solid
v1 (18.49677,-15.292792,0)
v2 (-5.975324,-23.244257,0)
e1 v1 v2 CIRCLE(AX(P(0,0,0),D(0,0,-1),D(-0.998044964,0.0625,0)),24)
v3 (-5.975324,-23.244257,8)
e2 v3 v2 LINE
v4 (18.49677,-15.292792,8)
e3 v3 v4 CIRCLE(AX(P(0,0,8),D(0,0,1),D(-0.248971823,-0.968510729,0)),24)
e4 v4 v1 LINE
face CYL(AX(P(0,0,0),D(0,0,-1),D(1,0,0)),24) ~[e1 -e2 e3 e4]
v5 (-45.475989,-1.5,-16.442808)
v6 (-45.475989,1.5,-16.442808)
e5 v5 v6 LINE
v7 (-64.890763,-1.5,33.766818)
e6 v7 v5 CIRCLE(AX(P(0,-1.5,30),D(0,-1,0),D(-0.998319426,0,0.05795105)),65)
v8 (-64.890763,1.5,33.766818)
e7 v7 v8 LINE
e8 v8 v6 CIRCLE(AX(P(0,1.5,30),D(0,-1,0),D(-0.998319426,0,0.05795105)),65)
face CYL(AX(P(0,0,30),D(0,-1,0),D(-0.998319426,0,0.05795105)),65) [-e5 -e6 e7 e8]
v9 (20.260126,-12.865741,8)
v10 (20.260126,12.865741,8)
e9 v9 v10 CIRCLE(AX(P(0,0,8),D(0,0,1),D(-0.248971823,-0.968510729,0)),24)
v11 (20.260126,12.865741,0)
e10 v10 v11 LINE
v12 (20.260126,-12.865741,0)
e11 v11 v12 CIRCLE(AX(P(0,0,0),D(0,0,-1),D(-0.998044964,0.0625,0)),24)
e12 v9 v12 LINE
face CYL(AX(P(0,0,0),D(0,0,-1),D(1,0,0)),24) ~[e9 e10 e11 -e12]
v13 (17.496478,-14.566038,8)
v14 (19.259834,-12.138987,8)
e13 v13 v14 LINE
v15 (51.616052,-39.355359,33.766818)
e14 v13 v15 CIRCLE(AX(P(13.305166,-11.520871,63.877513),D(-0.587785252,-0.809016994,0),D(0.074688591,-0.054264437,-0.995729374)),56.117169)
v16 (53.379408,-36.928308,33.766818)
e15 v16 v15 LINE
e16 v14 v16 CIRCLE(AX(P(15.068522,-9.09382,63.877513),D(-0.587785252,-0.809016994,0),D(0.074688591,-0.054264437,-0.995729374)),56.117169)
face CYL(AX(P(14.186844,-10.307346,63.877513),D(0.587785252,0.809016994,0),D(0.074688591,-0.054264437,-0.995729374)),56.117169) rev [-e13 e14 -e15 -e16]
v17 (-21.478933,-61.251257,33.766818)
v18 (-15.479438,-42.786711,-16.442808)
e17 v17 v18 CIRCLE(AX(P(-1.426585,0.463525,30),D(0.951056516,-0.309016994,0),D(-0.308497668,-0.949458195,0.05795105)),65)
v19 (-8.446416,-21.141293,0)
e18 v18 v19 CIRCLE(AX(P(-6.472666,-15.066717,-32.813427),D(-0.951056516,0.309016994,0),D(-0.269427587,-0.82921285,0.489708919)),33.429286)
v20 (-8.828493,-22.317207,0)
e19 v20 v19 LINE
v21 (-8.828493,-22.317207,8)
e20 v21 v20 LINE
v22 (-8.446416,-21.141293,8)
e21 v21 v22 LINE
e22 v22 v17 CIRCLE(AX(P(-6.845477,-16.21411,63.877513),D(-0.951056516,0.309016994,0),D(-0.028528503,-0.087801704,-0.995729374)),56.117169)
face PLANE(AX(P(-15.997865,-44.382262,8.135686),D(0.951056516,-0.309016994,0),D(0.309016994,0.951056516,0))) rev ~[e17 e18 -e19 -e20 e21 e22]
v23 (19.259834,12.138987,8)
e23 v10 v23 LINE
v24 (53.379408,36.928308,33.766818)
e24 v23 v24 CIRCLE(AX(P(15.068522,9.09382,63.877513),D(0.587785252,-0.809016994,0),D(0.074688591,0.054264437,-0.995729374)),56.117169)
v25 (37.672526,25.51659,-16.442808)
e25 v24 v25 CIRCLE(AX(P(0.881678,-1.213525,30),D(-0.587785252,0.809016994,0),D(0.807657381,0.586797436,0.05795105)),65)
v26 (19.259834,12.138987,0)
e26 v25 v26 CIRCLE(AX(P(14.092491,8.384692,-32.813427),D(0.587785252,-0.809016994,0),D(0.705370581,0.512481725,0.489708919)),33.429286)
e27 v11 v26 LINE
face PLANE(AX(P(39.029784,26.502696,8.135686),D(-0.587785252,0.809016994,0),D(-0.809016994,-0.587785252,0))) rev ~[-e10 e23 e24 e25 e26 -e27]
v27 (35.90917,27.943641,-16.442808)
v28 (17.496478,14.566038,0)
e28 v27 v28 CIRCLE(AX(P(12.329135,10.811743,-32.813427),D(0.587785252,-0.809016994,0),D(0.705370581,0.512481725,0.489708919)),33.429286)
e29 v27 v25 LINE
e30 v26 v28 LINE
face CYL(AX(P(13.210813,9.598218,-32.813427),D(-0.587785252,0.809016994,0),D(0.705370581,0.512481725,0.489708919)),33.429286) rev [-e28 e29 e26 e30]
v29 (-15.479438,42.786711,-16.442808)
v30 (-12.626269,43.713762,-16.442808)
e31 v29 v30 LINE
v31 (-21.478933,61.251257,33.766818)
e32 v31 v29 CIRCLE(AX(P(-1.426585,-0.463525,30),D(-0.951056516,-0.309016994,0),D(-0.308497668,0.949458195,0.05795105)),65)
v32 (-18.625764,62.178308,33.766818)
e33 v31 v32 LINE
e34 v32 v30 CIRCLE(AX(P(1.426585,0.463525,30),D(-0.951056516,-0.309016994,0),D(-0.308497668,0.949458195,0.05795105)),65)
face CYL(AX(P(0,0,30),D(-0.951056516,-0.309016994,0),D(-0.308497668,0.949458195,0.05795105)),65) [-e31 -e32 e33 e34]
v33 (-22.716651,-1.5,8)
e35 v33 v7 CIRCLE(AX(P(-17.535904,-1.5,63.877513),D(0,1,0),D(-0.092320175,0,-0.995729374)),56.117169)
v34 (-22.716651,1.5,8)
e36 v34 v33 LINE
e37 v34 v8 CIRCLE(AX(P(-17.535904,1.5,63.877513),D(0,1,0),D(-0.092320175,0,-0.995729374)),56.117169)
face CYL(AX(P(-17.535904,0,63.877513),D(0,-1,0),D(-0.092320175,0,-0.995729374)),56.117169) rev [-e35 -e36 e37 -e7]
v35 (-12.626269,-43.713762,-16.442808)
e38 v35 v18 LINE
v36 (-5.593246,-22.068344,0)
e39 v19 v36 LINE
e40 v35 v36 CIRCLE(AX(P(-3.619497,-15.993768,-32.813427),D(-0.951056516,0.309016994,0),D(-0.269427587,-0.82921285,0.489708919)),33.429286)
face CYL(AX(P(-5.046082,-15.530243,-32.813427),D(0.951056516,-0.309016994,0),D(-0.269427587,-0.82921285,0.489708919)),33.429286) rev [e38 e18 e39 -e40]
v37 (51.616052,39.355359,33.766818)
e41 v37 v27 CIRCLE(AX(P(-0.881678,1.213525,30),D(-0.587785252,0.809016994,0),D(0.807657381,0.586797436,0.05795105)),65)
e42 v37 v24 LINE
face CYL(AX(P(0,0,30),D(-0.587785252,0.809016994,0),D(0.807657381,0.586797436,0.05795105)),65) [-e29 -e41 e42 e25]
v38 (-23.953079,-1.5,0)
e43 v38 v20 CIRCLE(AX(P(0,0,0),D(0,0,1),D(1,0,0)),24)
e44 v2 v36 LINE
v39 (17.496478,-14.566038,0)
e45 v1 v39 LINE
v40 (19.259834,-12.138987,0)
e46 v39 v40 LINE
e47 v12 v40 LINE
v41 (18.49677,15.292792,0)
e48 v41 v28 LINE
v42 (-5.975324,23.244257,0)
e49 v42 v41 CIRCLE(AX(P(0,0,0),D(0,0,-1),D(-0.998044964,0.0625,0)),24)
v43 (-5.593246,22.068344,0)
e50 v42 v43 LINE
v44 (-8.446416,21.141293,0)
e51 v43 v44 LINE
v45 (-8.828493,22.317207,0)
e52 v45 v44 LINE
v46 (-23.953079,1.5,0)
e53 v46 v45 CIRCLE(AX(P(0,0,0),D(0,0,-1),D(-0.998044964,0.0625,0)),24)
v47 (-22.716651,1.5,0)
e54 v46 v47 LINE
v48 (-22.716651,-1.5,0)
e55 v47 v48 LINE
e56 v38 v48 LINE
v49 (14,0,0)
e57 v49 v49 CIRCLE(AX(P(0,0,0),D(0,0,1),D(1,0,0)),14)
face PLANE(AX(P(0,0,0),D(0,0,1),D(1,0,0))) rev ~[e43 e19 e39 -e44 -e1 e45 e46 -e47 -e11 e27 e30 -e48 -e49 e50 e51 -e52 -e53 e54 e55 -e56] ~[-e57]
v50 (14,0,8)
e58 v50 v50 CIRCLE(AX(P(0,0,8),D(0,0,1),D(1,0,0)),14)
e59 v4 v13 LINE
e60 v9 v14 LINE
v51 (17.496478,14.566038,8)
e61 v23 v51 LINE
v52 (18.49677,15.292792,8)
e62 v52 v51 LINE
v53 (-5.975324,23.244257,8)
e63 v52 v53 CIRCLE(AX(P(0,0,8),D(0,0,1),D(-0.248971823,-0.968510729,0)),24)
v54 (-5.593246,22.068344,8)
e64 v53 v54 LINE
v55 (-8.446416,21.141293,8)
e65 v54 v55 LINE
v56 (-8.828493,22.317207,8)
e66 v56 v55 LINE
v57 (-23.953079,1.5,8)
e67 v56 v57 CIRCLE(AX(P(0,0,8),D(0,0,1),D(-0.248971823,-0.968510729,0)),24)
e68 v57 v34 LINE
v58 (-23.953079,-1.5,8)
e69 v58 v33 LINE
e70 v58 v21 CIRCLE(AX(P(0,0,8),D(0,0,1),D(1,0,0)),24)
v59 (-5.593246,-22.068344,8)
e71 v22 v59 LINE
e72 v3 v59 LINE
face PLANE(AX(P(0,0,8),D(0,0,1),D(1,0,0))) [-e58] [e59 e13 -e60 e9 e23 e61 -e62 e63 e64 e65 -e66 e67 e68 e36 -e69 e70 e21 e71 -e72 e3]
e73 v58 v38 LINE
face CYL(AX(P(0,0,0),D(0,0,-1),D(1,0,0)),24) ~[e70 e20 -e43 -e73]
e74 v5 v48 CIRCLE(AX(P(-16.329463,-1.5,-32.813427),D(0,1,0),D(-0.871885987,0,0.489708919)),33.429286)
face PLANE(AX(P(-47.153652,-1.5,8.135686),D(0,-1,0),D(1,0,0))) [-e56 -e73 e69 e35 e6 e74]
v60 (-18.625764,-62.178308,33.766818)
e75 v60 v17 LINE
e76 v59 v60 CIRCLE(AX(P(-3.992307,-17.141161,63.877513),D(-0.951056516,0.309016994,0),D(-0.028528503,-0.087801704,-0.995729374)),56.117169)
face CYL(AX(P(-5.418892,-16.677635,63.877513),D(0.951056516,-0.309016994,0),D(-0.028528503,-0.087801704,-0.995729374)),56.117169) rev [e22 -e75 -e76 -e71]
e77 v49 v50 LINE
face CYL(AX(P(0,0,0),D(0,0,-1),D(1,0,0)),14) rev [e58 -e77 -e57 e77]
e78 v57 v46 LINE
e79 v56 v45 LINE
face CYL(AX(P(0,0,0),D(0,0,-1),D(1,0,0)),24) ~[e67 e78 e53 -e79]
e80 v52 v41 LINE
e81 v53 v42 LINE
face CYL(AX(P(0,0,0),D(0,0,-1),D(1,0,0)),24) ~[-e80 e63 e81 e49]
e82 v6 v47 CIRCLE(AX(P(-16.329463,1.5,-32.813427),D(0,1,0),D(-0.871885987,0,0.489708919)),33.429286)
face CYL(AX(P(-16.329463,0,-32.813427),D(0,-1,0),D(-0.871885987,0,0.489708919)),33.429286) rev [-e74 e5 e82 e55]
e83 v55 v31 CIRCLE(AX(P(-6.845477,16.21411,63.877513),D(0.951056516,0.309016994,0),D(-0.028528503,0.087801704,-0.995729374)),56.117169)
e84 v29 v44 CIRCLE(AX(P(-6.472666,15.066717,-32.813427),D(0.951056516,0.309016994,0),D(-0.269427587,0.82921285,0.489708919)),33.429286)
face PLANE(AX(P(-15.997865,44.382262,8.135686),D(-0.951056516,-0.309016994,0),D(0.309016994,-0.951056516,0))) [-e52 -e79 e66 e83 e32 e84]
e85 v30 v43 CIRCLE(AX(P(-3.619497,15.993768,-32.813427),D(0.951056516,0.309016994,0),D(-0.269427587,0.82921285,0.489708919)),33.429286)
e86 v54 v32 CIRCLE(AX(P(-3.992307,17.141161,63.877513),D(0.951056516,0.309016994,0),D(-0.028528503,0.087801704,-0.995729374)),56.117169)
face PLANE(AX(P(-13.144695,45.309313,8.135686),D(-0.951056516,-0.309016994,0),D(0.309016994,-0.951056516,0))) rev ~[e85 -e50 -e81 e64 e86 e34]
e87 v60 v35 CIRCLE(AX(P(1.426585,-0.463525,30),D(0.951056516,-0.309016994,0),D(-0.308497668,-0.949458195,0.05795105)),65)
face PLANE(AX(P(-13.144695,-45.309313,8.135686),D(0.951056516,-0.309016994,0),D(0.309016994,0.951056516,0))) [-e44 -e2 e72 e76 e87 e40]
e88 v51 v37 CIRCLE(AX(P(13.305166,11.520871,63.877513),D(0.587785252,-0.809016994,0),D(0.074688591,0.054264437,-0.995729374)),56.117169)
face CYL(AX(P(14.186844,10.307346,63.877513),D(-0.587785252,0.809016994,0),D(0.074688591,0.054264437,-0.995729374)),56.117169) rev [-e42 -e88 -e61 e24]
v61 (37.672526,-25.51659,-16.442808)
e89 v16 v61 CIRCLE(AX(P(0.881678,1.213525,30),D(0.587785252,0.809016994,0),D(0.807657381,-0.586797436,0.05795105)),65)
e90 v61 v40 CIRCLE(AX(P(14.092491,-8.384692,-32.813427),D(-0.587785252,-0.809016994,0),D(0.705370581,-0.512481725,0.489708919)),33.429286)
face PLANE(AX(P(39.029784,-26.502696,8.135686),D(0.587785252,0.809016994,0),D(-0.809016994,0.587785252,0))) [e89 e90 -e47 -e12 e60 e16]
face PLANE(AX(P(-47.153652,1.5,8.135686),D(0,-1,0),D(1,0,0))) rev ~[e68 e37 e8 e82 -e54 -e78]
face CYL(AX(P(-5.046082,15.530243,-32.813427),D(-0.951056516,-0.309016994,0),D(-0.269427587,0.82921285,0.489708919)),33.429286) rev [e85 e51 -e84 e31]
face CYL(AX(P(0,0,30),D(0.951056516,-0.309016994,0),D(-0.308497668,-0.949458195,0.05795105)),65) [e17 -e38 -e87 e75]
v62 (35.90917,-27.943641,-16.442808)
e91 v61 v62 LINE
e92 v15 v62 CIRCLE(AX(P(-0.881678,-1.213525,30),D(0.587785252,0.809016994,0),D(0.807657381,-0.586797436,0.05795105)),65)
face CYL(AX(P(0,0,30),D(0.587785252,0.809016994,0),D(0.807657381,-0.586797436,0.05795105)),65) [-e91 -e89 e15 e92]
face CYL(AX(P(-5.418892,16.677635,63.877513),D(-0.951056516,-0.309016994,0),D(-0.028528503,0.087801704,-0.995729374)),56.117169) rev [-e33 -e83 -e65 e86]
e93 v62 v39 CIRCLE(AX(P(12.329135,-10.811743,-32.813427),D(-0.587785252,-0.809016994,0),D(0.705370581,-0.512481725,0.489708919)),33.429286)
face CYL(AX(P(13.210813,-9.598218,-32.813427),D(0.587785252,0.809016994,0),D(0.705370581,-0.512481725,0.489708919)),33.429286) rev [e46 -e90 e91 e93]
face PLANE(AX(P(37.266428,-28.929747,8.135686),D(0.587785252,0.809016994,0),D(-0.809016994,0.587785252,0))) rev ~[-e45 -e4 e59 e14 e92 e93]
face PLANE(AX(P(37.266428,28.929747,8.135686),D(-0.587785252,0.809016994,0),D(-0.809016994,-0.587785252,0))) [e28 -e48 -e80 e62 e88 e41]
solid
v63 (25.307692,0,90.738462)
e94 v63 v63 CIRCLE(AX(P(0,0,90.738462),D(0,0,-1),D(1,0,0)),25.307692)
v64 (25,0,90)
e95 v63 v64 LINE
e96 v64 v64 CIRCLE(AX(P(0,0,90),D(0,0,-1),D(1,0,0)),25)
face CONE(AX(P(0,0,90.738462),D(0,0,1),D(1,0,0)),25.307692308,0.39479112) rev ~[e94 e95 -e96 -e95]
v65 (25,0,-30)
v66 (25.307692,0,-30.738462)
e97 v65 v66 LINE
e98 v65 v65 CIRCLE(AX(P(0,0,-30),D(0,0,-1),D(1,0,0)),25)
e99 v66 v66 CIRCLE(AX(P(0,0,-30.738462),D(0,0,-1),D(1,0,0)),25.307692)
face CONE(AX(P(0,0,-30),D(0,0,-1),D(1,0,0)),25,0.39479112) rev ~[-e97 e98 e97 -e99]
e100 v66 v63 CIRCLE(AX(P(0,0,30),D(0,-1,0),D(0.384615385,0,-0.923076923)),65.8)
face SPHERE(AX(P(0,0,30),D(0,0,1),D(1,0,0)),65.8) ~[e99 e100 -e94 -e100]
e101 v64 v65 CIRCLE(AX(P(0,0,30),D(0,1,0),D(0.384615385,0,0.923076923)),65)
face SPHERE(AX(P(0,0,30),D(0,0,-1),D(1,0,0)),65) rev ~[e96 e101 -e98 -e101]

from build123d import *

# Parameters (mm, degrees)
F0_R            = 24
F0_R_2          = 14
F1_DEPTH        = 8
F3_DEPTH        = 1.5
F3_COPIES_COUNT = 5


# Not quite as in the source:
# - a pattern or mirror of a feature is missing from the dataset's text; its kind, count and spacing are read off the source's solid


with BuildPart() as f1:
    # F0 (on Top) → F1 (new body)
    with BuildSketch(Plane.XY):
        Circle(F0_R)
        Circle(F0_R_2, mode=Mode.SUBTRACT)
    extrude(amount=F1_DEPTH)

    # F2 (on Front) → F3 (join, symmetric)
    with BuildSketch(Plane.XZ):
        with BuildLine():
            ThreePointArc((-45.4759894192, -16.4428076923), (-35.9063036344, -5.7161120336), (-22.7166505307, 0))
            Line((-22.7166505307, 0), (-22.7166505307, 8))
            ThreePointArc((-22.7166505307, 8), (-46.7930344517, 15.9905951618), (-64.8907626734, 33.7668182409))
            ThreePointArc((-64.8907626734, 33.7668182409), (-60.6255443353, 6.5576585205), (-45.4759894192, -16.4428076923))
        make_face()
    f3 = extrude(amount=F3_DEPTH, both=True)

    # F3_copies: F3 ×5 about axis
    f3_copies_axis = Axis((0, 0, 0), (0, 0, 1))
    for i in range(1, F3_COPIES_COUNT):
        add(f3.rotate(f3_copies_axis, i * 360 / F3_COPIES_COUNT))


with BuildPart() as f5:
    # F4 (on Front) → F5 (revolve)
    with BuildSketch(Plane.XZ):
        with BuildLine():
            ThreePointArc((25, 90), (65, 30), (25, -30))
            Line((25, -30), (25.3076923077, -30.7384615385))
            ThreePointArc((25.3076923077, -30.7384615385), (65.8, 30), (25.3076923077, 90.7384615385))
            Line((25.3076923077, 90.7384615385), (25, 90))
        make_face()
    revolve(axis=Axis((0, 0, 15), (0, 0, -1)))


solid = Compound([f1.part, f5.part])
